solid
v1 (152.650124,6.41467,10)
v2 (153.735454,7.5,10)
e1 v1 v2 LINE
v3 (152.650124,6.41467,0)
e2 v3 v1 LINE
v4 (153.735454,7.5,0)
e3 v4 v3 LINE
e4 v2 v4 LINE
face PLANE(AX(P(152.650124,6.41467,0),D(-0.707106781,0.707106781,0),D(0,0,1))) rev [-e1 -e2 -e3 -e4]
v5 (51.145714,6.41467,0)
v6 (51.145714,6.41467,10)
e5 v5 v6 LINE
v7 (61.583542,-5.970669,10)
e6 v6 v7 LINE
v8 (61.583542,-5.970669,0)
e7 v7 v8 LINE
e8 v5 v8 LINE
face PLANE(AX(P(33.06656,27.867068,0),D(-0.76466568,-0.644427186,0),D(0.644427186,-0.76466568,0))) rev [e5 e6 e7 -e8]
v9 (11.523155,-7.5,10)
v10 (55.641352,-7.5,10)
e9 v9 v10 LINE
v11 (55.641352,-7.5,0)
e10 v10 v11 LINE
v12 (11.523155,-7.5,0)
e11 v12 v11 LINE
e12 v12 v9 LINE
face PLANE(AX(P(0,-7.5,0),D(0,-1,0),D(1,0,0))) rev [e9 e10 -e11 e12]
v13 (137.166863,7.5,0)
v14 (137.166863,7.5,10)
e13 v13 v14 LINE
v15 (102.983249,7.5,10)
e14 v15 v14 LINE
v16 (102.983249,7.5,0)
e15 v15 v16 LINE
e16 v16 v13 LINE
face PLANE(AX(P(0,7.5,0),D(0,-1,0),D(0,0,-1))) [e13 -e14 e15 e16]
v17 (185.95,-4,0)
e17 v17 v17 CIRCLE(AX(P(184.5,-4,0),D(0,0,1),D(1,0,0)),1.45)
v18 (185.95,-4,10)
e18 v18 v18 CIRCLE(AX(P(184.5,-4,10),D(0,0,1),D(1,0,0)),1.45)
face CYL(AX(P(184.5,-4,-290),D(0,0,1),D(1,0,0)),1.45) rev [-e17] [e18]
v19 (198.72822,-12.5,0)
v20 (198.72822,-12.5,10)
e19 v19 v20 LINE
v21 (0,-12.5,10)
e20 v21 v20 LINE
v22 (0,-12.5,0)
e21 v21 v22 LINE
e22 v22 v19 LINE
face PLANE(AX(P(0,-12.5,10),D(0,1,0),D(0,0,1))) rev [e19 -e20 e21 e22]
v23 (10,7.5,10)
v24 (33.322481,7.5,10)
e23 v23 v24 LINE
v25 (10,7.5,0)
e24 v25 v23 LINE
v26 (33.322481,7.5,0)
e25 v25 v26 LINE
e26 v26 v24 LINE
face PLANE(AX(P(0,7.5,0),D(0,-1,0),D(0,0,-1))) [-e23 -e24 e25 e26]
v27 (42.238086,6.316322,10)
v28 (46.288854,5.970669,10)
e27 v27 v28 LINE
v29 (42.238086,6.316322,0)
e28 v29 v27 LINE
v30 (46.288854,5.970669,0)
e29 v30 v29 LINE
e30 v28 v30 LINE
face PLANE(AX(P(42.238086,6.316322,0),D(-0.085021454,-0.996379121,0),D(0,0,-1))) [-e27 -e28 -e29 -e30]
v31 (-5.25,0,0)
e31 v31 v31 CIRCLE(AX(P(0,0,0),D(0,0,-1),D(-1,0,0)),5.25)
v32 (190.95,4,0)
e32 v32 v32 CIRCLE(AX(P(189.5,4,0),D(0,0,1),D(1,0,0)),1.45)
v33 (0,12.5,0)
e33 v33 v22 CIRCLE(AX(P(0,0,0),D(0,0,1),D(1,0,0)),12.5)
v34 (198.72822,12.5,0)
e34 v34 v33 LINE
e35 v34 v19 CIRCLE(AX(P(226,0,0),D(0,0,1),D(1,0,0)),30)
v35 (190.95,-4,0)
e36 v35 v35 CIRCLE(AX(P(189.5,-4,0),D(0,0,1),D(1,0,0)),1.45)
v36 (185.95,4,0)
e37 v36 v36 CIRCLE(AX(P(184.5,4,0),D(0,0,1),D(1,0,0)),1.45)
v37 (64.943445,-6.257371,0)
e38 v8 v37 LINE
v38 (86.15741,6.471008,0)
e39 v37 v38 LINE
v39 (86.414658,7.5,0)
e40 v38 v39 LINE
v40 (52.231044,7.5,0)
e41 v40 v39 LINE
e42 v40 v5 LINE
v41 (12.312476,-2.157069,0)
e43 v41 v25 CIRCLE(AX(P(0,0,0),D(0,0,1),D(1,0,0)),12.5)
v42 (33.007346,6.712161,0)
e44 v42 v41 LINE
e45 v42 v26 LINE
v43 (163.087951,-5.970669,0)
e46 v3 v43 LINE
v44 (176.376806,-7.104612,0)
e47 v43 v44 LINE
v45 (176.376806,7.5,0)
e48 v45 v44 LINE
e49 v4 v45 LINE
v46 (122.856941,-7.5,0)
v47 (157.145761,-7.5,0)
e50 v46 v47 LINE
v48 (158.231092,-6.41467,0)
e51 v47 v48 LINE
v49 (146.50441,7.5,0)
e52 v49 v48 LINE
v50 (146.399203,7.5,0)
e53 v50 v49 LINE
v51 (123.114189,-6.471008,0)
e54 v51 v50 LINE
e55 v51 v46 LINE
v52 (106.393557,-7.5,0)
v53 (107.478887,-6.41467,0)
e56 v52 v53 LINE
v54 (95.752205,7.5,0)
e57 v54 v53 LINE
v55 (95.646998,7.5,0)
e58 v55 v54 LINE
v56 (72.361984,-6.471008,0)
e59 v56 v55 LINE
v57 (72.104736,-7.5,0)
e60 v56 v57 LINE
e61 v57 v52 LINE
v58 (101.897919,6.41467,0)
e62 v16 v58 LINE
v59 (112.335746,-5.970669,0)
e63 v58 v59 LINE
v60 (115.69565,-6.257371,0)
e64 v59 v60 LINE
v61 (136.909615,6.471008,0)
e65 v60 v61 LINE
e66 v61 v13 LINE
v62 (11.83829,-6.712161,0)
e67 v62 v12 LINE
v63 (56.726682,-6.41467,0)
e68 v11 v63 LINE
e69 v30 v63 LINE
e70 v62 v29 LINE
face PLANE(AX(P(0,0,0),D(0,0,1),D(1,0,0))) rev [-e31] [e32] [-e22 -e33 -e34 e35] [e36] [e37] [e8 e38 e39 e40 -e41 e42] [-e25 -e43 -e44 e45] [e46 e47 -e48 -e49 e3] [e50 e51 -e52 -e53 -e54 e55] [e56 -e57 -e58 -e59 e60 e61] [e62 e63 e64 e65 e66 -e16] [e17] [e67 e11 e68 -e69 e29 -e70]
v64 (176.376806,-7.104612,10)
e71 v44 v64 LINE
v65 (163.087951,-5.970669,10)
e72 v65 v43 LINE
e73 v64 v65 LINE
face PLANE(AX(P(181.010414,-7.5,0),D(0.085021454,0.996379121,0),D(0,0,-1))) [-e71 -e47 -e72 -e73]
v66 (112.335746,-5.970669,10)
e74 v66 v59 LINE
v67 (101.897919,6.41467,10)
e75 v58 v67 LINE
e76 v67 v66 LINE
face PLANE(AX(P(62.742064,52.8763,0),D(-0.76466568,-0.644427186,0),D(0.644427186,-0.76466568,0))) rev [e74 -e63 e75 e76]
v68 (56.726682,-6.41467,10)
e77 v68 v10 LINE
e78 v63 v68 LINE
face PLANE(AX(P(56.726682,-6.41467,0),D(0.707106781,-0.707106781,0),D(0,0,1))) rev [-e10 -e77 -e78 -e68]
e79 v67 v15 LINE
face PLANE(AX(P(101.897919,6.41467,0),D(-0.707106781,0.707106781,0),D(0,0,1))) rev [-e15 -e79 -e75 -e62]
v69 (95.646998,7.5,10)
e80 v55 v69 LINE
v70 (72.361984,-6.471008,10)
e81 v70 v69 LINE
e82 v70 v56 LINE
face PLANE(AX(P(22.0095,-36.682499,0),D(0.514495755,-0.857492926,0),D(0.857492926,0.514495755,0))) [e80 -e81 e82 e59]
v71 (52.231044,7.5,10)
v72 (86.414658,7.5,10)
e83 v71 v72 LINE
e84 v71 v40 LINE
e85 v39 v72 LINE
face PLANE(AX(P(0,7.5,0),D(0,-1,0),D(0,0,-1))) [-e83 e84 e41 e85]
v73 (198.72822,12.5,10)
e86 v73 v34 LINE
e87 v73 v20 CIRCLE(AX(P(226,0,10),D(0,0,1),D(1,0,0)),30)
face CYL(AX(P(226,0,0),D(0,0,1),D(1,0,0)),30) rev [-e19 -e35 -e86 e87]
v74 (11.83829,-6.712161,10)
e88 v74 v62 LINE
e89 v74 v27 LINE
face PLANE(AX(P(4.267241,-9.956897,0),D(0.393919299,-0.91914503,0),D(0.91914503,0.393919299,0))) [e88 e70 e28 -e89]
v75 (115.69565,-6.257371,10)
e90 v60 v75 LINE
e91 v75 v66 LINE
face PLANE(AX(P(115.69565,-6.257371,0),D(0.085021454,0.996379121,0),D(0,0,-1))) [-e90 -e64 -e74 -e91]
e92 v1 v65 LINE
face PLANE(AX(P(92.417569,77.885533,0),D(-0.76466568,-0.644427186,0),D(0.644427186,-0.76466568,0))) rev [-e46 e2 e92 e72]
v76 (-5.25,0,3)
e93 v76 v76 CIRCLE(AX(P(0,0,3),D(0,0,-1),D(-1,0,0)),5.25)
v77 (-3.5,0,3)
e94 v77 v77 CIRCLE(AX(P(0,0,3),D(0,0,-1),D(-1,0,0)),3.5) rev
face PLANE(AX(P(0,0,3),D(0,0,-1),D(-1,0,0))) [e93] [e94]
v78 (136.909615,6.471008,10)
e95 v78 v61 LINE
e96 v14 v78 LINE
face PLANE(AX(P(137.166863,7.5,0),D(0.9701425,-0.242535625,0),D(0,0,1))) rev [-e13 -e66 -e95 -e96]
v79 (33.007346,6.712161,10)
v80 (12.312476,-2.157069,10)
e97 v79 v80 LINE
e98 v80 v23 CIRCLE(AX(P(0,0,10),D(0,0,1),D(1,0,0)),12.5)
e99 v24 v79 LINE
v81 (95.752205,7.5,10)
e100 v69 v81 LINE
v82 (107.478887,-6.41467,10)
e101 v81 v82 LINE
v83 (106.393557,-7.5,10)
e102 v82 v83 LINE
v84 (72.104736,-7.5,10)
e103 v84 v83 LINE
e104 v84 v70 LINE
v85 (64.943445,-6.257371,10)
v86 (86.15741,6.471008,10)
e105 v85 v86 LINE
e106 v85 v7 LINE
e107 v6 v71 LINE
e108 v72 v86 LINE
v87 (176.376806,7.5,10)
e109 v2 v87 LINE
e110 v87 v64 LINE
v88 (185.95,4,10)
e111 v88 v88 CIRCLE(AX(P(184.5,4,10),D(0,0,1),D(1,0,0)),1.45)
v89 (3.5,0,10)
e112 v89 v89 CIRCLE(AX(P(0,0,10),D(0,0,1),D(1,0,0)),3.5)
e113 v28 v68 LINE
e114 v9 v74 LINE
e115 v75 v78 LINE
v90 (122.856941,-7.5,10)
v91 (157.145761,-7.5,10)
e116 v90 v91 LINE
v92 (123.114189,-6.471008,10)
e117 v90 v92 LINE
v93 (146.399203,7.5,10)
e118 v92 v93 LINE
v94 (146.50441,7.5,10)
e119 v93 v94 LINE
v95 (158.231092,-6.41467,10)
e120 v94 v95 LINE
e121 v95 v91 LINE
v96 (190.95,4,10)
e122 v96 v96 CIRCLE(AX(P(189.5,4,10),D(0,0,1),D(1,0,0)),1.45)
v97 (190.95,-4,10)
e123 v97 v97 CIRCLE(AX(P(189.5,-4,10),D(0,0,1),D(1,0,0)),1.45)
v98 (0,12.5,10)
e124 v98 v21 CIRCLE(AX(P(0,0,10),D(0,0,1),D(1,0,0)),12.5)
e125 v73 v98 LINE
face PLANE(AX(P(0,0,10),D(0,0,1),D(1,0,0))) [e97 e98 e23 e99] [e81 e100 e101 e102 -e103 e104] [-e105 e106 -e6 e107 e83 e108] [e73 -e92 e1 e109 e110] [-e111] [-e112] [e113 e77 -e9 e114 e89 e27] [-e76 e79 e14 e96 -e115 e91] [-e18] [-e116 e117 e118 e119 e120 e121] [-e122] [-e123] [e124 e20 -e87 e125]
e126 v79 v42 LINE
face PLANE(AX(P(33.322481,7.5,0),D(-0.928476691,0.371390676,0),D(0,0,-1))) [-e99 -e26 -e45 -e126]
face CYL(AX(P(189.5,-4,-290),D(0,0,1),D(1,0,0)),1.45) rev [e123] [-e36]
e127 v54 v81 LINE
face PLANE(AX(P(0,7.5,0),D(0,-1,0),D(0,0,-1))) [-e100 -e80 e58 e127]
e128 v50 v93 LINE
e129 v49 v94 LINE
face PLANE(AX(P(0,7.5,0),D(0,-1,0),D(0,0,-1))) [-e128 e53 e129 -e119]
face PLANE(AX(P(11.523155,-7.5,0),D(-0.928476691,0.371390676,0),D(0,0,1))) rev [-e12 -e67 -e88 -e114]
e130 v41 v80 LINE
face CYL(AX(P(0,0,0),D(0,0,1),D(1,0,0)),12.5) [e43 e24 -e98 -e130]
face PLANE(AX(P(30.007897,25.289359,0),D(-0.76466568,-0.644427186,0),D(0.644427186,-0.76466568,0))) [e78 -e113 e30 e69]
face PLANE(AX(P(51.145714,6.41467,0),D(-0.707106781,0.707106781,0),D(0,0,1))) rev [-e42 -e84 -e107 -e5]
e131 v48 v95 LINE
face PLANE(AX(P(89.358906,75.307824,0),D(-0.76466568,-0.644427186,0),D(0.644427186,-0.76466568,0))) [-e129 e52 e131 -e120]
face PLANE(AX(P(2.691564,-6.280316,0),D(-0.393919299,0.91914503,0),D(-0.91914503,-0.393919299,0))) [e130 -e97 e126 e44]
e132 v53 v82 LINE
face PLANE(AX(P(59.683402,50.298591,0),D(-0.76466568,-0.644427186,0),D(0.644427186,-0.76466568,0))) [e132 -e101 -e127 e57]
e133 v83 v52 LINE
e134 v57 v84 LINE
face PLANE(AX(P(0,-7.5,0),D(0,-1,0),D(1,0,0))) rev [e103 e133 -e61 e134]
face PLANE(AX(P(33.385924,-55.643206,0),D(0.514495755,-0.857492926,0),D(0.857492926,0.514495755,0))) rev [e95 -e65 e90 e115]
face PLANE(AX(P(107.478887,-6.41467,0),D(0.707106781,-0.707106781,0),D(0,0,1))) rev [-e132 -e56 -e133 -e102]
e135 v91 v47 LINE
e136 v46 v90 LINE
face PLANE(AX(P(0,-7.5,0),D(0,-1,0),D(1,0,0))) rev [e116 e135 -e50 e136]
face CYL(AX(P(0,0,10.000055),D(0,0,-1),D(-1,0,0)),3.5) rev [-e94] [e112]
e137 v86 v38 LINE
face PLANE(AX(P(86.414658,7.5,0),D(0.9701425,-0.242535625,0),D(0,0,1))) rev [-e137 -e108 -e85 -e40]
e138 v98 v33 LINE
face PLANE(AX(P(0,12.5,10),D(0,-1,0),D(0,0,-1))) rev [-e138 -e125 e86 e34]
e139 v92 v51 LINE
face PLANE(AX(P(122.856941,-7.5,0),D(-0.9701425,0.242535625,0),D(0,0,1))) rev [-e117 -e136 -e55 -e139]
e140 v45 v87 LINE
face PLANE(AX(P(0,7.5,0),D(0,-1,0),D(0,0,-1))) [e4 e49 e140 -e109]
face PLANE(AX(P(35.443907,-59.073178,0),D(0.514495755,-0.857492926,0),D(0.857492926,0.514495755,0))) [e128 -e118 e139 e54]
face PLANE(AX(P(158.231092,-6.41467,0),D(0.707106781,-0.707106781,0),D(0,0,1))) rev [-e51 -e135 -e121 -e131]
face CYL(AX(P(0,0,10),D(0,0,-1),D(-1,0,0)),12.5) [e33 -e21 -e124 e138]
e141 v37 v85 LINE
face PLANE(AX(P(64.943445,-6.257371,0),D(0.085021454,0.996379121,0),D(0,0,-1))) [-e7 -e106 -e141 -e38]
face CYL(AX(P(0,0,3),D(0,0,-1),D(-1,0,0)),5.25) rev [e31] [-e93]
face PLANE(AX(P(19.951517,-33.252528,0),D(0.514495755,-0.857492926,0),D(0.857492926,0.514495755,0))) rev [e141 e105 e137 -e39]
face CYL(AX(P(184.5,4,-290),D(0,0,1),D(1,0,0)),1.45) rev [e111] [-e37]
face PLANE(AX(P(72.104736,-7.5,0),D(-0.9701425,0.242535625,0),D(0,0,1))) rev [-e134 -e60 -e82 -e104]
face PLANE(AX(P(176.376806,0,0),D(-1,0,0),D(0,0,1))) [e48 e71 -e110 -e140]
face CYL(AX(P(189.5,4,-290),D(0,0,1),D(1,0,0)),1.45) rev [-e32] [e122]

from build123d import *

# Parameters (mm, degrees)
EXTRUDE_1_DEPTH          = 10
CUT_EXTRUDE_1_DEPTH      = 252.652538235
CUT_EXTRUDE_1_DEPTH_BACK = 252.652538235
SKETCH_7_R               = 3.5
CUT_EXTRUDE_5_DEPTH      = 252.652538235
SKETCH_8_R               = 5
CUT_EXTRUDE_6_DEPTH      = 3
SKETCH_9_R               = 3
CUT_EXTRUDE_7_DEPTH      = 252.652538235
CUT_EXTRUDE_START        = -10
SKETCH_11_R              = 27
CUT_EXTRUDE_9_DEPTH      = 10
SKETCH_12_R              = 30
CUT_EXTRUDE_10_DEPTH     = 10
SKETCH_14_R              = 1.45
CUT_EXTRUDE_12_DEPTH     = 300
CHAMFER_1_SIZE           = 16.633608268
CHAMFER_1_SIZE_2         = 2
CHAMFER_1_SIZE_3         = 1.419352868
CHAMFER_1_SIZE_4         = 1.457737974
CHAMFER_1_SIZE_5         = 2.415237377
CHAMFER_1_SIZE_6         = 1.523154621
CHAMFER_1_SIZE_7         = 3.004873211
SKETCH_15_R              = 5.25
SKETCH_15_R_2            = 3.5
CUT_EXTRUDE_13_DEPTH     = 3


with BuildPart() as part:
    # 草图1 → 凸台-拉伸1 (new body)
    with BuildSketch(Plane.XY):
        with BuildLine():
            Line((0, 12.5), (199.067804112, 12.5))
            ThreePointArc((199.067804112, 12.5), (250, 0), (199.067804112, -12.5))
            Line((199.067804112, -12.5), (0, -12.5))
            ThreePointArc((0, -12.5), (-12.5, 0), (0, 12.5))
        make_face()
    extrude(amount=EXTRUDE_1_DEPTH)

    # 草图3 → 切除-拉伸1 (cut, two sides: drawn at the far end of the back side and taken through both)
    with BuildSketch(Plane.XY.offset(10).offset(-CUT_EXTRUDE_1_DEPTH_BACK)):
        Polygon((176.376805713, 7.5), (151.73545401, 7.5), (164.376805713, -7.5), (176.376805713, -7.5), align=None)
        Polygon((159.145761472, -7.5), (146.504409769, 7.5), (146.399203355, 7.5), (121.399203355, -7.5), align=None)
        Polygon((113.624600829, -7.5), (138.624600829, 7.5), (100.983249125, 7.5), align=None)
        Polygon((70.646998471, -7.5), (108.393556588, -7.5), (95.752204884, 7.5), (95.646998471, 7.5), align=None)
        Polygon((50.231044241, 7.5), (62.872395944, -7.5), (87.872395944, 7.5), align=None)
        Polygon((10, -7.5), (57.641351703, -7.5), (45, 7.5), align=None)
        with BuildLine():
            Line((34.845635859, 7.5), (10, 7.5))
            ThreePointArc((10, 7.5), (12.156331085, 2.910947362), (12.312475569, -2.157068696))
            Line((12.312475569, -2.157068696), (34.845635859, 7.5))
        make_face()
    extrude(amount=CUT_EXTRUDE_1_DEPTH + CUT_EXTRUDE_1_DEPTH_BACK, mode=Mode.SUBTRACT)

    # 草图7 → 切除-拉伸5 (cut, through all)
    with BuildSketch(Plane(origin=(0, 0, 0), x_dir=(-1, 0, 0), z_dir=(0, 0, -1))):
        Circle(SKETCH_7_R)
    extrude(amount=-CUT_EXTRUDE_5_DEPTH, mode=Mode.SUBTRACT)

    # 草图8 → 切除-拉伸6 (cut)
    with BuildSketch(Plane(origin=(0, 0, 0), x_dir=(-1, 0, 0), z_dir=(0, 0, -1))):
        with Locations((-223, 0)):
            Circle(SKETCH_8_R)
    extrude(amount=-CUT_EXTRUDE_6_DEPTH, mode=Mode.SUBTRACT)

    # 草图9 → 切除-拉伸7 (cut, through all)
    with BuildSketch(Plane(origin=(0, 0, 0), x_dir=(-1, 0, 0), z_dir=(0, 0, -1))):
        with Locations((-223, 0)):
            Circle(SKETCH_9_R)
    extrude(amount=-CUT_EXTRUDE_7_DEPTH, mode=Mode.SUBTRACT)

    # 草图11 → 切除-拉伸9 (cut)
    with BuildSketch(Plane.XY.offset(10).offset(CUT_EXTRUDE_START)):
        with Locations((223, 0)):
            Circle(SKETCH_11_R)
    extrude(amount=CUT_EXTRUDE_9_DEPTH, mode=Mode.SUBTRACT)

    # 草图12 → 切除-拉伸10 (cut)
    with BuildSketch(Plane.XY.offset(10)):
        with Locations((226, 0)):
            Circle(SKETCH_12_R)
    extrude(amount=-CUT_EXTRUDE_10_DEPTH, mode=Mode.SUBTRACT)

    # 草图14 → 切除-拉伸12 (cut)
    with BuildSketch(Plane.XY.offset(10)):
        with Locations((184.5, 4)):
            Circle(SKETCH_14_R)
        with Locations((189.5, 4)):
            Circle(SKETCH_14_R)
        with Locations((189.5, -4)):
            Circle(SKETCH_14_R)
        with Locations((184.5, -4)):
            Circle(SKETCH_14_R)
    extrude(amount=-CUT_EXTRUDE_12_DEPTH, mode=Mode.SUBTRACT)

    # 倒角1
    # the kernel refuses this chamfer: 16.633608268, 3.004873211, 2.415237377, 2, 1.523154621, 1.457737974, 1.419352868 mm, written as the material it adds along each edge
    with BuildSketch(Plane(origin=(164.376805713, -7.5, 0), x_dir=(0.9999946519205123, -0.0032704939035876055, 0), z_dir=(0, 0, 1))) as chamfer_1_piece_1:
        Polygon((CHAMFER_1_SIZE * 0.999994651904, CHAMFER_1_SIZE * 0.00327049390353), (-CHAMFER_1_SIZE_2 * 0.646924574173, CHAMFER_1_SIZE_2 * 0.762553995026), (0, 0), align=None)
    extrude(amount=10)
    with BuildSketch(Plane(origin=(151.73545401, 7.5, 0), x_dir=(0.9996219169112968, 0.027495876610586605, 0), z_dir=(0, 0, 1))) as chamfer_1_piece_2:
        Polygon((CHAMFER_1_SIZE_2 * 0.999621916911, -CHAMFER_1_SIZE_2 * 0.0274958766106), (CHAMFER_1_SIZE_3 * 0.623158385834, -CHAMFER_1_SIZE_3 * 0.782095662754), (0, 0), align=None)
    extrude(amount=10)
    with BuildSketch(Plane(origin=(159.145761472, -7.5, 10), x_dir=(-0.9996219169112968, -0.02749587661058747, 0), z_dir=(0, 0, -1))) as chamfer_1_piece_3:
        Polygon((CHAMFER_1_SIZE_2 * 0.999621916911, CHAMFER_1_SIZE_2 * 0.0274958766106), (CHAMFER_1_SIZE_3 * 0.623158385834, CHAMFER_1_SIZE_3 * 0.782095662754), (0, 0), align=None)
    extrude(amount=10)
    with BuildSketch(Plane(origin=(121.399203355, -7.5, 10), x_dir=(0.9985473741645164, -0.05388080872768336, 0), z_dir=(0, 0, -1))) as chamfer_1_piece_4:
        Polygon((CHAMFER_1_SIZE_4 * 0.998547373967, -CHAMFER_1_SIZE_4 * 0.053880808717), (CHAMFER_1_SIZE_2 * 0.828525861946, -CHAMFER_1_SIZE_2 * 0.559950797917), (0, 0), align=None)
    extrude(amount=10)
    with BuildSketch(Plane(origin=(113.624600829, -7.5, 10), x_dir=(-0.6693179531686358, 0.7429760948820275, 0), z_dir=(0, 0, -1))) as chamfer_1_piece_5:
        Polygon((CHAMFER_1_SIZE_2 * 0.999455005814, CHAMFER_1_SIZE_2 * 0.033010473375), (-CHAMFER_1_SIZE_5 * 0.191677362679, CHAMFER_1_SIZE_5 * 0.981457991195), (0, 0), align=None)
    extrude(amount=10)
    with BuildSketch(Plane(origin=(138.624600829, 7.5, 0), x_dir=(-0.9985473741645164, 0.05388080872768389, 0), z_dir=(0, 0, 1))) as chamfer_1_piece_6:
        Polygon((CHAMFER_1_SIZE_4 * 0.998547373967, CHAMFER_1_SIZE_4 * 0.053880808717), (CHAMFER_1_SIZE_2 * 0.828525861946, CHAMFER_1_SIZE_2 * 0.559950797917), (0, 0), align=None)
    extrude(amount=10)
    with BuildSketch(Plane(origin=(100.983249125, 7.5, 10), x_dir=(0.6007510451121151, -0.7994361649291964, 0), z_dir=(0, 0, -1))) as chamfer_1_piece_7:
        Polygon((CHAMFER_1_SIZE_3 * 0.998441703797, -CHAMFER_1_SIZE_3 * 0.0558046920381), (CHAMFER_1_SIZE_2 * 0.600751045112, -CHAMFER_1_SIZE_2 * 0.799436164929), (0, 0), align=None)
    extrude(amount=10)
    with BuildSketch(Plane(origin=(70.646998471, -7.5, 0), x_dir=(0.8430222103307435, 0.537878752963033, 0), z_dir=(0, 0, 1))) as chamfer_1_piece_8:
        Polygon((CHAMFER_1_SIZE_2 * 0.999621916911, -CHAMFER_1_SIZE_2 * 0.0274958766106), (CHAMFER_1_SIZE_4 * 0.843022210164, -CHAMFER_1_SIZE_4 * 0.537878752857), (0, 0), align=None)
    extrude(amount=10)
    with BuildSketch(Plane(origin=(108.393556588, -7.5, 0), x_dir=(-0.6007510451121131, 0.799436164929198, 0), z_dir=(0, 0, 1)), Plane(origin=(50.231044241, 7.5, 0), x_dir=(0.6007510451121165, -0.7994361649291954, 0), z_dir=(0, 0, 1)), Plane(origin=(57.641351703, -7.5, 0), x_dir=(-0.6007510451121163, 0.7994361649291957, 0), z_dir=(0, 0, 1))) as chamfer_1_piece_9:
        Polygon((CHAMFER_1_SIZE_3 * 0.998441703797, CHAMFER_1_SIZE_3 * 0.0558046920381), (CHAMFER_1_SIZE_2 * 0.600751045112, CHAMFER_1_SIZE_2 * 0.799436164929), (0, 0), align=None)
    extrude(amount=10)
    with BuildSketch(Plane(origin=(87.872395944, 7.5, 10), x_dir=(-0.8430222103307434, -0.5378787529630333, 0), z_dir=(0, 0, -1))) as chamfer_1_piece_10:
        Polygon((CHAMFER_1_SIZE_2 * 0.999621916911, CHAMFER_1_SIZE_2 * 0.0274958766106), (CHAMFER_1_SIZE_4 * 0.843022210164, CHAMFER_1_SIZE_4 * 0.537878752857), (0, 0), align=None)
    extrude(amount=10)
    with BuildSketch(Plane(origin=(62.872395944, -7.5, 10), x_dir=(0.8689411613860879, 0.4949154049420938, 0), z_dir=(0, 0, -1))) as chamfer_1_piece_11:
        Polygon((CHAMFER_1_SIZE_5 * 0.99974277381, -CHAMFER_1_SIZE_5 * 0.0226800806836), (-CHAMFER_1_SIZE_2 * 0.18152448307, -CHAMFER_1_SIZE_2 * 0.983386425596), (0, 0), align=None)
    extrude(amount=10)
    with BuildSketch(Plane(origin=(10, -7.5, 10), x_dir=(0.9079663603978809, 0.419043062686671, 0), z_dir=(0, 0, -1))) as chamfer_1_piece_12:
        Polygon((CHAMFER_1_SIZE_2 * 0.999621916911, CHAMFER_1_SIZE_2 * 0.0274958766106), (CHAMFER_1_SIZE_6 * 0.907966360501, CHAMFER_1_SIZE_6 * 0.419043062734), (0, 0), align=None)
    extrude(amount=10)
    with BuildSketch(Plane(origin=(45, 7.5, 10), x_dir=(-0.9261548899255846, -0.3771433677886015, 0), z_dir=(0, 0, -1))) as chamfer_1_piece_13:
        Polygon((CHAMFER_1_SIZE_7 * 0.999834715095, -CHAMFER_1_SIZE_7 * 0.0181808325096), (-CHAMFER_1_SIZE_2 * 0.308450800004, -CHAMFER_1_SIZE_2 * 0.951240297705), (0, 0), align=None)
    extrude(amount=10)
    with BuildSketch(Plane(origin=(34.845635859, 7.5, 0), x_dir=(-0.9987654472434115, 0.0496747560906775, 0), z_dir=(0, 0, 1))) as chamfer_1_piece_14:
        Polygon((CHAMFER_1_SIZE_6 * 0.998765447357, CHAMFER_1_SIZE_6 * 0.0496747560963), (CHAMFER_1_SIZE_2 * 0.898442451911, CHAMFER_1_SIZE_2 * 0.439091289601), (0, 0), align=None)
    extrude(amount=10)

    # 草图15 → 切除-拉伸13 (cut)
    with BuildSketch(Plane(origin=(0, 0, 0), x_dir=(-1, 0, 0), z_dir=(0, 0, -1))):
        Circle(SKETCH_15_R)
        Circle(SKETCH_15_R_2, mode=Mode.SUBTRACT)
    extrude(amount=-CUT_EXTRUDE_13_DEPTH, mode=Mode.SUBTRACT)


solid = part.part
